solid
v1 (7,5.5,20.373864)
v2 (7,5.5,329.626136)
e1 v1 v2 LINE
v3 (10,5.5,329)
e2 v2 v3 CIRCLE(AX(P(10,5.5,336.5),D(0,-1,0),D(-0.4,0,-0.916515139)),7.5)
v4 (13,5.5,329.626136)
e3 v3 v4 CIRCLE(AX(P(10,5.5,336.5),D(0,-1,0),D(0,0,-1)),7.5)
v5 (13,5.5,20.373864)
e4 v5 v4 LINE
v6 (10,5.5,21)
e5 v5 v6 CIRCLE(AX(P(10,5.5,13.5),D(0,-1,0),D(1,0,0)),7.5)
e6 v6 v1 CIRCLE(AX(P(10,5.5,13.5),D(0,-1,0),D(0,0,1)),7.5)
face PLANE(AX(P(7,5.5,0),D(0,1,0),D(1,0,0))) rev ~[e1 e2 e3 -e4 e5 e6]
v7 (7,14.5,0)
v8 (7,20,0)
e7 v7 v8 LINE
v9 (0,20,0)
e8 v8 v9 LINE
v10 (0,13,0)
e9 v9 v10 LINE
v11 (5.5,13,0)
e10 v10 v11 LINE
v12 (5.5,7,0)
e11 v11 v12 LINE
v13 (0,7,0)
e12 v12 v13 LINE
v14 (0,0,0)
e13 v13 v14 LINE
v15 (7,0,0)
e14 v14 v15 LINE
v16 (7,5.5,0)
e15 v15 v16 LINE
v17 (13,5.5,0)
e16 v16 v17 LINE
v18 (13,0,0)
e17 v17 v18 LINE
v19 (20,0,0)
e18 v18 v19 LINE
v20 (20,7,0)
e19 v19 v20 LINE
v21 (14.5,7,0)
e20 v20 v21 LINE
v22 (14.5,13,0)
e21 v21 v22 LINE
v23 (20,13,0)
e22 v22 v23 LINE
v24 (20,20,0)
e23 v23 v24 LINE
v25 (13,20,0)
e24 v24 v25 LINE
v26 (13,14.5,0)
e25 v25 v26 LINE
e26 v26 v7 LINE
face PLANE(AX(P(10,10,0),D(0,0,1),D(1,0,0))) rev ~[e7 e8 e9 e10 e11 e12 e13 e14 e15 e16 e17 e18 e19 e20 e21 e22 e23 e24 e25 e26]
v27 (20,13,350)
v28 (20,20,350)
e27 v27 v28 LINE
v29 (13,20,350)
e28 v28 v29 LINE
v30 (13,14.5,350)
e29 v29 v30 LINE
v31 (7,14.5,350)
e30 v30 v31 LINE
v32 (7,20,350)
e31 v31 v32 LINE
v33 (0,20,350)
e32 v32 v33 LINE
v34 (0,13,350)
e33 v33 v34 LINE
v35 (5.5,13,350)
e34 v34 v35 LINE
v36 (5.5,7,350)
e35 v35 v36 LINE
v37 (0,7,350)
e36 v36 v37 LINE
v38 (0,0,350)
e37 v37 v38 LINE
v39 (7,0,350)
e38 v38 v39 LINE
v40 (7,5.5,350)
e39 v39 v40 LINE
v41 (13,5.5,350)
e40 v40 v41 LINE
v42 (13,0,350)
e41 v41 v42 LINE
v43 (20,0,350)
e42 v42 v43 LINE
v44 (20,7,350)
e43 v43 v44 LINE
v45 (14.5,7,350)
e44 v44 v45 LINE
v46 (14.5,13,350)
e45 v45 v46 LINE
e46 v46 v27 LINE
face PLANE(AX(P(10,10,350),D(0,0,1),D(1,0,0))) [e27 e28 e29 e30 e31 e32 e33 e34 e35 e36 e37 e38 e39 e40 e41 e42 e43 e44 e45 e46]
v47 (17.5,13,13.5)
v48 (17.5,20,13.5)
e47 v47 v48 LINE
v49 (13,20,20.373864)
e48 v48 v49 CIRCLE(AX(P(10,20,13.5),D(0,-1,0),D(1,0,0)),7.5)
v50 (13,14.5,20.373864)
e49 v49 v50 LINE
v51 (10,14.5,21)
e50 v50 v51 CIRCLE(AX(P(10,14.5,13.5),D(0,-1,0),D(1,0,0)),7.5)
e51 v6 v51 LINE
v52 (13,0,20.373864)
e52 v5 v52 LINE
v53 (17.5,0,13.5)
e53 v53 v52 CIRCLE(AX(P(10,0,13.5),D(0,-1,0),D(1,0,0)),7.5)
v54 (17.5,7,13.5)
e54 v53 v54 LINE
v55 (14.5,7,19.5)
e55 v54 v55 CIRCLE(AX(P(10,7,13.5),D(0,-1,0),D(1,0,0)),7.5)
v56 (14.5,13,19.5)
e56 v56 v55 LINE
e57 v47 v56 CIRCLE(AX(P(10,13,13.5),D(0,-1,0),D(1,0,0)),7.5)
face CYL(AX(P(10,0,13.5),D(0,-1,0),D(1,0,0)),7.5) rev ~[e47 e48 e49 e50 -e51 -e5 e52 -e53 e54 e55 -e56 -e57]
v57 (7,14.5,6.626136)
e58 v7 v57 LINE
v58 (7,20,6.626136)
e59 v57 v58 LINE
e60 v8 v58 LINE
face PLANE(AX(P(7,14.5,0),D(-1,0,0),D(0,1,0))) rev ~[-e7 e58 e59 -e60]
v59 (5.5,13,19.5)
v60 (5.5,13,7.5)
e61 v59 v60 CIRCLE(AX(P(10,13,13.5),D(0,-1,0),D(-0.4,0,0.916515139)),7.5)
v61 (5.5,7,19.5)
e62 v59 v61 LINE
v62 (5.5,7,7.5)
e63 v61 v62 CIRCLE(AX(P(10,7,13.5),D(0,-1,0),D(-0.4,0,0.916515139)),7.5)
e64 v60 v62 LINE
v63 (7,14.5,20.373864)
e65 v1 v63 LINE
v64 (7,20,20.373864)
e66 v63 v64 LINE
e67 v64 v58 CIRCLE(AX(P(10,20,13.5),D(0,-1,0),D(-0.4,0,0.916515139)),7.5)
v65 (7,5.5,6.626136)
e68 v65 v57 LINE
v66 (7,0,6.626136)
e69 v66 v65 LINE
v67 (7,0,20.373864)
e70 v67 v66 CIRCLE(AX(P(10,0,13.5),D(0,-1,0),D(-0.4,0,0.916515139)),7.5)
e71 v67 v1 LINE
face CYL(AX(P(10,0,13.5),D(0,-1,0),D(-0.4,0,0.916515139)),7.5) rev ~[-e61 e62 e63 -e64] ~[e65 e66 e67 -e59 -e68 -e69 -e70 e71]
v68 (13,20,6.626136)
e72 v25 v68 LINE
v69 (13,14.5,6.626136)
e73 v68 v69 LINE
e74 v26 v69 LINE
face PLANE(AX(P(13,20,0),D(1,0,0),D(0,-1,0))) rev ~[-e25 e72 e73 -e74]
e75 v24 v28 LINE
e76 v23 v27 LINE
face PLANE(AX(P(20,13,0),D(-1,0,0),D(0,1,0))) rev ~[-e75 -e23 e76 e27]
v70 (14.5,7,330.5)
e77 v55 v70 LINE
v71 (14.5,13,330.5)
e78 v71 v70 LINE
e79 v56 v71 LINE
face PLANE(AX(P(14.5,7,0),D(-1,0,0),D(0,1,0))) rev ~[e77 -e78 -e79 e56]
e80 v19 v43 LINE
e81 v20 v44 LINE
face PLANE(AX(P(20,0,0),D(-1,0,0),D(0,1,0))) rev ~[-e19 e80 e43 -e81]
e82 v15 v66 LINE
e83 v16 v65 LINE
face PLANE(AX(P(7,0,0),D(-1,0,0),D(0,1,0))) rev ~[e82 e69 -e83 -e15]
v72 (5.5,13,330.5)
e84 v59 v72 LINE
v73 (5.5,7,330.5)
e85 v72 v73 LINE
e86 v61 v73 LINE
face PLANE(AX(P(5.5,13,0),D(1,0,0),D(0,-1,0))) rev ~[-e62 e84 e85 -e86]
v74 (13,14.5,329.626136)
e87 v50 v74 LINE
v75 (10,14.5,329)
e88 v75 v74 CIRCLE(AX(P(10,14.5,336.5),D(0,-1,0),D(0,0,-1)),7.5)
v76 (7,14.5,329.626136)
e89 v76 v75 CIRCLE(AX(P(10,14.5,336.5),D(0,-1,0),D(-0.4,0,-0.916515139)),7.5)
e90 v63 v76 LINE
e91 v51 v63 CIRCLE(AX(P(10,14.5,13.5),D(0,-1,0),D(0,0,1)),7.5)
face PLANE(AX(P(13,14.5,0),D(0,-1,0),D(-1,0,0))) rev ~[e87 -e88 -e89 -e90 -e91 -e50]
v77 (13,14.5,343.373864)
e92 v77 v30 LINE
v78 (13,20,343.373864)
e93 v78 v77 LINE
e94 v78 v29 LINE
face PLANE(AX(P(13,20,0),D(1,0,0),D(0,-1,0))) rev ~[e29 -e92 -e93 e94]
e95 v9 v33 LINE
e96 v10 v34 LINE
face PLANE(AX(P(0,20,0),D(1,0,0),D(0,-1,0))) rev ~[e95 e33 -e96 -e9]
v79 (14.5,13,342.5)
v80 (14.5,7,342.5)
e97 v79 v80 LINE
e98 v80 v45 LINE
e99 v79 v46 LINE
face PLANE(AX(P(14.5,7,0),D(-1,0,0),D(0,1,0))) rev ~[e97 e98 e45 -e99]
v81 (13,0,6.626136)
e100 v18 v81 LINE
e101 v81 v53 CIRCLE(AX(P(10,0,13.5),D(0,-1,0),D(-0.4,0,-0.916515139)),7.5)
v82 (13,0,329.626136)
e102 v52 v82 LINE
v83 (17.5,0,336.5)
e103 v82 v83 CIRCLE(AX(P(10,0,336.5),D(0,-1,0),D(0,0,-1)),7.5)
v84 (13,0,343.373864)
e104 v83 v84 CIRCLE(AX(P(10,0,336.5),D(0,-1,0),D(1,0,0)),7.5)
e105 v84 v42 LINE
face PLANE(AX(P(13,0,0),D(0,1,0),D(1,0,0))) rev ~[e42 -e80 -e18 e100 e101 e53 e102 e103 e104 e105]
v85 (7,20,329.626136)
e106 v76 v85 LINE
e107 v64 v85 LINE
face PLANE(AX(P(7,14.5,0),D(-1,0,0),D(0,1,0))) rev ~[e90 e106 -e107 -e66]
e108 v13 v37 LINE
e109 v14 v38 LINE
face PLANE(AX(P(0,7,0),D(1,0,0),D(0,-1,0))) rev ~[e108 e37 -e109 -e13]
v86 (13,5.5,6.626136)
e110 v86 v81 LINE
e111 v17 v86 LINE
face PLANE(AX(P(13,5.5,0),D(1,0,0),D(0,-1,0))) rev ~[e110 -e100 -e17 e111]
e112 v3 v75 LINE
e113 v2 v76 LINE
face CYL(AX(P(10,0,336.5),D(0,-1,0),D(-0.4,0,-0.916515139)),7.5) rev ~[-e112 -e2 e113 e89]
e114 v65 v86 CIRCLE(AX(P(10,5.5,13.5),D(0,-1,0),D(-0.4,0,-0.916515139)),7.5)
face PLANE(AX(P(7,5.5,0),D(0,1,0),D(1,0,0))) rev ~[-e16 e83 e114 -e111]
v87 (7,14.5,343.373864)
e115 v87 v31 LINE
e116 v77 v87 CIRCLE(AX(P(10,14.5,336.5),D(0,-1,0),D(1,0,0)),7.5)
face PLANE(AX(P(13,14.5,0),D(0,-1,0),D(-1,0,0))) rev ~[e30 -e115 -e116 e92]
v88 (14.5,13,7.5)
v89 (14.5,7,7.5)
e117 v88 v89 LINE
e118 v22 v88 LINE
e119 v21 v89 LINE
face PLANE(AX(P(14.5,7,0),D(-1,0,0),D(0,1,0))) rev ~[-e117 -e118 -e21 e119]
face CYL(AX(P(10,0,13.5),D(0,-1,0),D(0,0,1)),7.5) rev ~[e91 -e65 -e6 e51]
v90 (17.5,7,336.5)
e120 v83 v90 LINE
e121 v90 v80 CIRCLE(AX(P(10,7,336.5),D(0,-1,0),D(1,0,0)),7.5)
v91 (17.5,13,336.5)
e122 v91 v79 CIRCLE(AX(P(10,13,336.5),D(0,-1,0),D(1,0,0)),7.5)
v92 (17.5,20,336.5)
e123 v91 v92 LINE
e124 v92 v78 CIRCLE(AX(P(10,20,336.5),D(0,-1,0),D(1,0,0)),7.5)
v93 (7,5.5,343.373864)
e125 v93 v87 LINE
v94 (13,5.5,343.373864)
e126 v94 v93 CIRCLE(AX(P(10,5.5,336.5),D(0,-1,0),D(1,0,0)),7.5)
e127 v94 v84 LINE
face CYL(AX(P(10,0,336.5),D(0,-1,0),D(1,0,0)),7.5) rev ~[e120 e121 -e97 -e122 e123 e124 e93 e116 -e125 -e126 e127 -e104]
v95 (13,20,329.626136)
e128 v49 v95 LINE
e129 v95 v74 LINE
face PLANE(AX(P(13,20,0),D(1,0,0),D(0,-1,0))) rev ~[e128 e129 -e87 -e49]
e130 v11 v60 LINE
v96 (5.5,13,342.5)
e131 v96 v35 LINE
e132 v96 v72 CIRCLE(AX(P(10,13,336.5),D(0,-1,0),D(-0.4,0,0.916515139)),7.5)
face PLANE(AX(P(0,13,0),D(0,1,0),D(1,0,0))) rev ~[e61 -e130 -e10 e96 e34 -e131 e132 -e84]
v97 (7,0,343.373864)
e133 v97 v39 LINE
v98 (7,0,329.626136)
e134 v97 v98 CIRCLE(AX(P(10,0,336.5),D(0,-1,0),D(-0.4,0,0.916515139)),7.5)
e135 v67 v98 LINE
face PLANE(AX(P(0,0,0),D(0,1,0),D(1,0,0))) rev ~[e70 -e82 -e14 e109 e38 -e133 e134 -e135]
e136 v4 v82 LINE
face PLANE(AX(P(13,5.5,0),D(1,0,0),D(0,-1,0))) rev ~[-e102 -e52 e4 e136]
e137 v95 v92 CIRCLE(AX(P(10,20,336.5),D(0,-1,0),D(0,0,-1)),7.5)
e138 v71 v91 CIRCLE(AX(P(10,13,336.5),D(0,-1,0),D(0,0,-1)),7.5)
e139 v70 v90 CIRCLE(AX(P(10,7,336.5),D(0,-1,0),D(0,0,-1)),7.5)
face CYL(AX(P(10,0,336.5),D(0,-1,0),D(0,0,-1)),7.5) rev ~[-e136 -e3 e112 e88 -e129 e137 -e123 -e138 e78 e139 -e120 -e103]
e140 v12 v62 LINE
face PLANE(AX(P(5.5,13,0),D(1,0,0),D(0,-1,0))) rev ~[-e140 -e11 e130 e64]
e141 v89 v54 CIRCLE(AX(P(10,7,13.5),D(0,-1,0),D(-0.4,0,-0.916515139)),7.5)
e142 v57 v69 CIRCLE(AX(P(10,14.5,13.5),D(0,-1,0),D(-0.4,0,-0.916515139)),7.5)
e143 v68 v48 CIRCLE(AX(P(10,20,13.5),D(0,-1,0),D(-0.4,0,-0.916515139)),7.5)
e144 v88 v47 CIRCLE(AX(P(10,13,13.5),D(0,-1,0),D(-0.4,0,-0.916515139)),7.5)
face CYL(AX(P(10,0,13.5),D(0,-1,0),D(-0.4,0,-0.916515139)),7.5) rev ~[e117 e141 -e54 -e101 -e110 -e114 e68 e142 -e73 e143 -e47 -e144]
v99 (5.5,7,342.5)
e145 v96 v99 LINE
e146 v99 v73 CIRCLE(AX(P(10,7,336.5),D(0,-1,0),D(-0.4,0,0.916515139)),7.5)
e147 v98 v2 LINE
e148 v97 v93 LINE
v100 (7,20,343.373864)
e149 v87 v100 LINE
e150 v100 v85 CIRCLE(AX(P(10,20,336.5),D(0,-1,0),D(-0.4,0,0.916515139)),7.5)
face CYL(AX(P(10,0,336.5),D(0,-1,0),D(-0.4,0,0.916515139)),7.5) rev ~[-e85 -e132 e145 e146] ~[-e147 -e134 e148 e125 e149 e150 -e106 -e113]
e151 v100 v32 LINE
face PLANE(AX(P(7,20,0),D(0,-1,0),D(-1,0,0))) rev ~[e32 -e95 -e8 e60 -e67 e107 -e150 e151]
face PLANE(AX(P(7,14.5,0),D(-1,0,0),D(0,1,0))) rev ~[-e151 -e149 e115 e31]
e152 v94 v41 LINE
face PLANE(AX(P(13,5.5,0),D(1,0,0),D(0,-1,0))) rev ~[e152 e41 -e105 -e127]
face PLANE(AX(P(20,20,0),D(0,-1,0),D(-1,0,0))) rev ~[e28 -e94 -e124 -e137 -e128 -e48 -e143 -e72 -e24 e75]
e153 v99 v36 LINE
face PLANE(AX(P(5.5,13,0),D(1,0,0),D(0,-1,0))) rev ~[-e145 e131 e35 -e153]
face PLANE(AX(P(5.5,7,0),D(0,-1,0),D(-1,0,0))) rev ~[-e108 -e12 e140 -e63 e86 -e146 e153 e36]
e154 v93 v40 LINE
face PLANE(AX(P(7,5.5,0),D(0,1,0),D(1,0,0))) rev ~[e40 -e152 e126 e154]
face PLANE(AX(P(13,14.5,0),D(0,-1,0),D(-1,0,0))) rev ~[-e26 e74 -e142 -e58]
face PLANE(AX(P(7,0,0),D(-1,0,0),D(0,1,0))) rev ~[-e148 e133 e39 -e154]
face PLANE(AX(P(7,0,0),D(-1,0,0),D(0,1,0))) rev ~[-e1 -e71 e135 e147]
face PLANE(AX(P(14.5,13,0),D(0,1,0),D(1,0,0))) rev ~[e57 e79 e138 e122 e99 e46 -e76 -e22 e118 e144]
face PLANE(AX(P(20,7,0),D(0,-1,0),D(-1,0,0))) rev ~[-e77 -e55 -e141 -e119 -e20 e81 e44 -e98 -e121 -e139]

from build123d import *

# Parameters (mm, degrees)
F1_DEPTH = 350
F3_DEPTH = 25


with BuildPart() as f1:
    # F0 (on Top) → F1 (new body)
    with BuildSketch(Plane.XY):
        Polygon((0, 7), (0, 0), (7, 0), (7, 5.5), (13, 5.5), (13, 0), (20, 0), (20, 7), (14.5, 7), (14.5, 13), (20, 13), (20, 20), (13, 20), (13, 14.5), (7, 14.5), (7, 20), (0, 20), (0, 13), (5.5, 13), (5.5, 7), align=None)
    extrude(amount=F1_DEPTH)

    # F2 (on face) → F3 (cut)
    with BuildSketch(Plane.XZ):
        with BuildLine():
            ThreePointArc((7, 329.6261364576), (8.4676776723, 329.158202653), (10, 329))
            ThreePointArc((10, 329), (15.3033008589, 331.1966991411), (17.5, 336.5))
            ThreePointArc((17.5, 336.5), (14.1079191813, 342.774950199), (7, 343.3738635424))
            Line((7, 343.3738635424), (7, 329.6261364576))
        make_face()
        with BuildLine():
            ThreePointArc((7, 343.3738635424), (2.5, 336.5), (7, 329.6261364576))
            Line((7, 329.6261364576), (7, 343.3738635424))
        make_face()
        with BuildLine():
            Line((7, 6.6261364576), (7, 20.3738635424))
            ThreePointArc((7, 20.3738635424), (2.5, 13.5), (7, 6.6261364576))
        make_face()
        with BuildLine():
            ThreePointArc((10, 21), (8.4676776723, 20.841797347), (7, 20.3738635424))
            Line((7, 20.3738635424), (7, 6.6261364576))
            ThreePointArc((7, 6.6261364576), (14.1079191813, 7.225049801), (17.5, 13.5))
            ThreePointArc((17.5, 13.5), (15.3033008589, 18.8033008589), (10, 21))
        make_face()
    extrude(amount=-F3_DEPTH, mode=Mode.SUBTRACT)


solid = f1.part
